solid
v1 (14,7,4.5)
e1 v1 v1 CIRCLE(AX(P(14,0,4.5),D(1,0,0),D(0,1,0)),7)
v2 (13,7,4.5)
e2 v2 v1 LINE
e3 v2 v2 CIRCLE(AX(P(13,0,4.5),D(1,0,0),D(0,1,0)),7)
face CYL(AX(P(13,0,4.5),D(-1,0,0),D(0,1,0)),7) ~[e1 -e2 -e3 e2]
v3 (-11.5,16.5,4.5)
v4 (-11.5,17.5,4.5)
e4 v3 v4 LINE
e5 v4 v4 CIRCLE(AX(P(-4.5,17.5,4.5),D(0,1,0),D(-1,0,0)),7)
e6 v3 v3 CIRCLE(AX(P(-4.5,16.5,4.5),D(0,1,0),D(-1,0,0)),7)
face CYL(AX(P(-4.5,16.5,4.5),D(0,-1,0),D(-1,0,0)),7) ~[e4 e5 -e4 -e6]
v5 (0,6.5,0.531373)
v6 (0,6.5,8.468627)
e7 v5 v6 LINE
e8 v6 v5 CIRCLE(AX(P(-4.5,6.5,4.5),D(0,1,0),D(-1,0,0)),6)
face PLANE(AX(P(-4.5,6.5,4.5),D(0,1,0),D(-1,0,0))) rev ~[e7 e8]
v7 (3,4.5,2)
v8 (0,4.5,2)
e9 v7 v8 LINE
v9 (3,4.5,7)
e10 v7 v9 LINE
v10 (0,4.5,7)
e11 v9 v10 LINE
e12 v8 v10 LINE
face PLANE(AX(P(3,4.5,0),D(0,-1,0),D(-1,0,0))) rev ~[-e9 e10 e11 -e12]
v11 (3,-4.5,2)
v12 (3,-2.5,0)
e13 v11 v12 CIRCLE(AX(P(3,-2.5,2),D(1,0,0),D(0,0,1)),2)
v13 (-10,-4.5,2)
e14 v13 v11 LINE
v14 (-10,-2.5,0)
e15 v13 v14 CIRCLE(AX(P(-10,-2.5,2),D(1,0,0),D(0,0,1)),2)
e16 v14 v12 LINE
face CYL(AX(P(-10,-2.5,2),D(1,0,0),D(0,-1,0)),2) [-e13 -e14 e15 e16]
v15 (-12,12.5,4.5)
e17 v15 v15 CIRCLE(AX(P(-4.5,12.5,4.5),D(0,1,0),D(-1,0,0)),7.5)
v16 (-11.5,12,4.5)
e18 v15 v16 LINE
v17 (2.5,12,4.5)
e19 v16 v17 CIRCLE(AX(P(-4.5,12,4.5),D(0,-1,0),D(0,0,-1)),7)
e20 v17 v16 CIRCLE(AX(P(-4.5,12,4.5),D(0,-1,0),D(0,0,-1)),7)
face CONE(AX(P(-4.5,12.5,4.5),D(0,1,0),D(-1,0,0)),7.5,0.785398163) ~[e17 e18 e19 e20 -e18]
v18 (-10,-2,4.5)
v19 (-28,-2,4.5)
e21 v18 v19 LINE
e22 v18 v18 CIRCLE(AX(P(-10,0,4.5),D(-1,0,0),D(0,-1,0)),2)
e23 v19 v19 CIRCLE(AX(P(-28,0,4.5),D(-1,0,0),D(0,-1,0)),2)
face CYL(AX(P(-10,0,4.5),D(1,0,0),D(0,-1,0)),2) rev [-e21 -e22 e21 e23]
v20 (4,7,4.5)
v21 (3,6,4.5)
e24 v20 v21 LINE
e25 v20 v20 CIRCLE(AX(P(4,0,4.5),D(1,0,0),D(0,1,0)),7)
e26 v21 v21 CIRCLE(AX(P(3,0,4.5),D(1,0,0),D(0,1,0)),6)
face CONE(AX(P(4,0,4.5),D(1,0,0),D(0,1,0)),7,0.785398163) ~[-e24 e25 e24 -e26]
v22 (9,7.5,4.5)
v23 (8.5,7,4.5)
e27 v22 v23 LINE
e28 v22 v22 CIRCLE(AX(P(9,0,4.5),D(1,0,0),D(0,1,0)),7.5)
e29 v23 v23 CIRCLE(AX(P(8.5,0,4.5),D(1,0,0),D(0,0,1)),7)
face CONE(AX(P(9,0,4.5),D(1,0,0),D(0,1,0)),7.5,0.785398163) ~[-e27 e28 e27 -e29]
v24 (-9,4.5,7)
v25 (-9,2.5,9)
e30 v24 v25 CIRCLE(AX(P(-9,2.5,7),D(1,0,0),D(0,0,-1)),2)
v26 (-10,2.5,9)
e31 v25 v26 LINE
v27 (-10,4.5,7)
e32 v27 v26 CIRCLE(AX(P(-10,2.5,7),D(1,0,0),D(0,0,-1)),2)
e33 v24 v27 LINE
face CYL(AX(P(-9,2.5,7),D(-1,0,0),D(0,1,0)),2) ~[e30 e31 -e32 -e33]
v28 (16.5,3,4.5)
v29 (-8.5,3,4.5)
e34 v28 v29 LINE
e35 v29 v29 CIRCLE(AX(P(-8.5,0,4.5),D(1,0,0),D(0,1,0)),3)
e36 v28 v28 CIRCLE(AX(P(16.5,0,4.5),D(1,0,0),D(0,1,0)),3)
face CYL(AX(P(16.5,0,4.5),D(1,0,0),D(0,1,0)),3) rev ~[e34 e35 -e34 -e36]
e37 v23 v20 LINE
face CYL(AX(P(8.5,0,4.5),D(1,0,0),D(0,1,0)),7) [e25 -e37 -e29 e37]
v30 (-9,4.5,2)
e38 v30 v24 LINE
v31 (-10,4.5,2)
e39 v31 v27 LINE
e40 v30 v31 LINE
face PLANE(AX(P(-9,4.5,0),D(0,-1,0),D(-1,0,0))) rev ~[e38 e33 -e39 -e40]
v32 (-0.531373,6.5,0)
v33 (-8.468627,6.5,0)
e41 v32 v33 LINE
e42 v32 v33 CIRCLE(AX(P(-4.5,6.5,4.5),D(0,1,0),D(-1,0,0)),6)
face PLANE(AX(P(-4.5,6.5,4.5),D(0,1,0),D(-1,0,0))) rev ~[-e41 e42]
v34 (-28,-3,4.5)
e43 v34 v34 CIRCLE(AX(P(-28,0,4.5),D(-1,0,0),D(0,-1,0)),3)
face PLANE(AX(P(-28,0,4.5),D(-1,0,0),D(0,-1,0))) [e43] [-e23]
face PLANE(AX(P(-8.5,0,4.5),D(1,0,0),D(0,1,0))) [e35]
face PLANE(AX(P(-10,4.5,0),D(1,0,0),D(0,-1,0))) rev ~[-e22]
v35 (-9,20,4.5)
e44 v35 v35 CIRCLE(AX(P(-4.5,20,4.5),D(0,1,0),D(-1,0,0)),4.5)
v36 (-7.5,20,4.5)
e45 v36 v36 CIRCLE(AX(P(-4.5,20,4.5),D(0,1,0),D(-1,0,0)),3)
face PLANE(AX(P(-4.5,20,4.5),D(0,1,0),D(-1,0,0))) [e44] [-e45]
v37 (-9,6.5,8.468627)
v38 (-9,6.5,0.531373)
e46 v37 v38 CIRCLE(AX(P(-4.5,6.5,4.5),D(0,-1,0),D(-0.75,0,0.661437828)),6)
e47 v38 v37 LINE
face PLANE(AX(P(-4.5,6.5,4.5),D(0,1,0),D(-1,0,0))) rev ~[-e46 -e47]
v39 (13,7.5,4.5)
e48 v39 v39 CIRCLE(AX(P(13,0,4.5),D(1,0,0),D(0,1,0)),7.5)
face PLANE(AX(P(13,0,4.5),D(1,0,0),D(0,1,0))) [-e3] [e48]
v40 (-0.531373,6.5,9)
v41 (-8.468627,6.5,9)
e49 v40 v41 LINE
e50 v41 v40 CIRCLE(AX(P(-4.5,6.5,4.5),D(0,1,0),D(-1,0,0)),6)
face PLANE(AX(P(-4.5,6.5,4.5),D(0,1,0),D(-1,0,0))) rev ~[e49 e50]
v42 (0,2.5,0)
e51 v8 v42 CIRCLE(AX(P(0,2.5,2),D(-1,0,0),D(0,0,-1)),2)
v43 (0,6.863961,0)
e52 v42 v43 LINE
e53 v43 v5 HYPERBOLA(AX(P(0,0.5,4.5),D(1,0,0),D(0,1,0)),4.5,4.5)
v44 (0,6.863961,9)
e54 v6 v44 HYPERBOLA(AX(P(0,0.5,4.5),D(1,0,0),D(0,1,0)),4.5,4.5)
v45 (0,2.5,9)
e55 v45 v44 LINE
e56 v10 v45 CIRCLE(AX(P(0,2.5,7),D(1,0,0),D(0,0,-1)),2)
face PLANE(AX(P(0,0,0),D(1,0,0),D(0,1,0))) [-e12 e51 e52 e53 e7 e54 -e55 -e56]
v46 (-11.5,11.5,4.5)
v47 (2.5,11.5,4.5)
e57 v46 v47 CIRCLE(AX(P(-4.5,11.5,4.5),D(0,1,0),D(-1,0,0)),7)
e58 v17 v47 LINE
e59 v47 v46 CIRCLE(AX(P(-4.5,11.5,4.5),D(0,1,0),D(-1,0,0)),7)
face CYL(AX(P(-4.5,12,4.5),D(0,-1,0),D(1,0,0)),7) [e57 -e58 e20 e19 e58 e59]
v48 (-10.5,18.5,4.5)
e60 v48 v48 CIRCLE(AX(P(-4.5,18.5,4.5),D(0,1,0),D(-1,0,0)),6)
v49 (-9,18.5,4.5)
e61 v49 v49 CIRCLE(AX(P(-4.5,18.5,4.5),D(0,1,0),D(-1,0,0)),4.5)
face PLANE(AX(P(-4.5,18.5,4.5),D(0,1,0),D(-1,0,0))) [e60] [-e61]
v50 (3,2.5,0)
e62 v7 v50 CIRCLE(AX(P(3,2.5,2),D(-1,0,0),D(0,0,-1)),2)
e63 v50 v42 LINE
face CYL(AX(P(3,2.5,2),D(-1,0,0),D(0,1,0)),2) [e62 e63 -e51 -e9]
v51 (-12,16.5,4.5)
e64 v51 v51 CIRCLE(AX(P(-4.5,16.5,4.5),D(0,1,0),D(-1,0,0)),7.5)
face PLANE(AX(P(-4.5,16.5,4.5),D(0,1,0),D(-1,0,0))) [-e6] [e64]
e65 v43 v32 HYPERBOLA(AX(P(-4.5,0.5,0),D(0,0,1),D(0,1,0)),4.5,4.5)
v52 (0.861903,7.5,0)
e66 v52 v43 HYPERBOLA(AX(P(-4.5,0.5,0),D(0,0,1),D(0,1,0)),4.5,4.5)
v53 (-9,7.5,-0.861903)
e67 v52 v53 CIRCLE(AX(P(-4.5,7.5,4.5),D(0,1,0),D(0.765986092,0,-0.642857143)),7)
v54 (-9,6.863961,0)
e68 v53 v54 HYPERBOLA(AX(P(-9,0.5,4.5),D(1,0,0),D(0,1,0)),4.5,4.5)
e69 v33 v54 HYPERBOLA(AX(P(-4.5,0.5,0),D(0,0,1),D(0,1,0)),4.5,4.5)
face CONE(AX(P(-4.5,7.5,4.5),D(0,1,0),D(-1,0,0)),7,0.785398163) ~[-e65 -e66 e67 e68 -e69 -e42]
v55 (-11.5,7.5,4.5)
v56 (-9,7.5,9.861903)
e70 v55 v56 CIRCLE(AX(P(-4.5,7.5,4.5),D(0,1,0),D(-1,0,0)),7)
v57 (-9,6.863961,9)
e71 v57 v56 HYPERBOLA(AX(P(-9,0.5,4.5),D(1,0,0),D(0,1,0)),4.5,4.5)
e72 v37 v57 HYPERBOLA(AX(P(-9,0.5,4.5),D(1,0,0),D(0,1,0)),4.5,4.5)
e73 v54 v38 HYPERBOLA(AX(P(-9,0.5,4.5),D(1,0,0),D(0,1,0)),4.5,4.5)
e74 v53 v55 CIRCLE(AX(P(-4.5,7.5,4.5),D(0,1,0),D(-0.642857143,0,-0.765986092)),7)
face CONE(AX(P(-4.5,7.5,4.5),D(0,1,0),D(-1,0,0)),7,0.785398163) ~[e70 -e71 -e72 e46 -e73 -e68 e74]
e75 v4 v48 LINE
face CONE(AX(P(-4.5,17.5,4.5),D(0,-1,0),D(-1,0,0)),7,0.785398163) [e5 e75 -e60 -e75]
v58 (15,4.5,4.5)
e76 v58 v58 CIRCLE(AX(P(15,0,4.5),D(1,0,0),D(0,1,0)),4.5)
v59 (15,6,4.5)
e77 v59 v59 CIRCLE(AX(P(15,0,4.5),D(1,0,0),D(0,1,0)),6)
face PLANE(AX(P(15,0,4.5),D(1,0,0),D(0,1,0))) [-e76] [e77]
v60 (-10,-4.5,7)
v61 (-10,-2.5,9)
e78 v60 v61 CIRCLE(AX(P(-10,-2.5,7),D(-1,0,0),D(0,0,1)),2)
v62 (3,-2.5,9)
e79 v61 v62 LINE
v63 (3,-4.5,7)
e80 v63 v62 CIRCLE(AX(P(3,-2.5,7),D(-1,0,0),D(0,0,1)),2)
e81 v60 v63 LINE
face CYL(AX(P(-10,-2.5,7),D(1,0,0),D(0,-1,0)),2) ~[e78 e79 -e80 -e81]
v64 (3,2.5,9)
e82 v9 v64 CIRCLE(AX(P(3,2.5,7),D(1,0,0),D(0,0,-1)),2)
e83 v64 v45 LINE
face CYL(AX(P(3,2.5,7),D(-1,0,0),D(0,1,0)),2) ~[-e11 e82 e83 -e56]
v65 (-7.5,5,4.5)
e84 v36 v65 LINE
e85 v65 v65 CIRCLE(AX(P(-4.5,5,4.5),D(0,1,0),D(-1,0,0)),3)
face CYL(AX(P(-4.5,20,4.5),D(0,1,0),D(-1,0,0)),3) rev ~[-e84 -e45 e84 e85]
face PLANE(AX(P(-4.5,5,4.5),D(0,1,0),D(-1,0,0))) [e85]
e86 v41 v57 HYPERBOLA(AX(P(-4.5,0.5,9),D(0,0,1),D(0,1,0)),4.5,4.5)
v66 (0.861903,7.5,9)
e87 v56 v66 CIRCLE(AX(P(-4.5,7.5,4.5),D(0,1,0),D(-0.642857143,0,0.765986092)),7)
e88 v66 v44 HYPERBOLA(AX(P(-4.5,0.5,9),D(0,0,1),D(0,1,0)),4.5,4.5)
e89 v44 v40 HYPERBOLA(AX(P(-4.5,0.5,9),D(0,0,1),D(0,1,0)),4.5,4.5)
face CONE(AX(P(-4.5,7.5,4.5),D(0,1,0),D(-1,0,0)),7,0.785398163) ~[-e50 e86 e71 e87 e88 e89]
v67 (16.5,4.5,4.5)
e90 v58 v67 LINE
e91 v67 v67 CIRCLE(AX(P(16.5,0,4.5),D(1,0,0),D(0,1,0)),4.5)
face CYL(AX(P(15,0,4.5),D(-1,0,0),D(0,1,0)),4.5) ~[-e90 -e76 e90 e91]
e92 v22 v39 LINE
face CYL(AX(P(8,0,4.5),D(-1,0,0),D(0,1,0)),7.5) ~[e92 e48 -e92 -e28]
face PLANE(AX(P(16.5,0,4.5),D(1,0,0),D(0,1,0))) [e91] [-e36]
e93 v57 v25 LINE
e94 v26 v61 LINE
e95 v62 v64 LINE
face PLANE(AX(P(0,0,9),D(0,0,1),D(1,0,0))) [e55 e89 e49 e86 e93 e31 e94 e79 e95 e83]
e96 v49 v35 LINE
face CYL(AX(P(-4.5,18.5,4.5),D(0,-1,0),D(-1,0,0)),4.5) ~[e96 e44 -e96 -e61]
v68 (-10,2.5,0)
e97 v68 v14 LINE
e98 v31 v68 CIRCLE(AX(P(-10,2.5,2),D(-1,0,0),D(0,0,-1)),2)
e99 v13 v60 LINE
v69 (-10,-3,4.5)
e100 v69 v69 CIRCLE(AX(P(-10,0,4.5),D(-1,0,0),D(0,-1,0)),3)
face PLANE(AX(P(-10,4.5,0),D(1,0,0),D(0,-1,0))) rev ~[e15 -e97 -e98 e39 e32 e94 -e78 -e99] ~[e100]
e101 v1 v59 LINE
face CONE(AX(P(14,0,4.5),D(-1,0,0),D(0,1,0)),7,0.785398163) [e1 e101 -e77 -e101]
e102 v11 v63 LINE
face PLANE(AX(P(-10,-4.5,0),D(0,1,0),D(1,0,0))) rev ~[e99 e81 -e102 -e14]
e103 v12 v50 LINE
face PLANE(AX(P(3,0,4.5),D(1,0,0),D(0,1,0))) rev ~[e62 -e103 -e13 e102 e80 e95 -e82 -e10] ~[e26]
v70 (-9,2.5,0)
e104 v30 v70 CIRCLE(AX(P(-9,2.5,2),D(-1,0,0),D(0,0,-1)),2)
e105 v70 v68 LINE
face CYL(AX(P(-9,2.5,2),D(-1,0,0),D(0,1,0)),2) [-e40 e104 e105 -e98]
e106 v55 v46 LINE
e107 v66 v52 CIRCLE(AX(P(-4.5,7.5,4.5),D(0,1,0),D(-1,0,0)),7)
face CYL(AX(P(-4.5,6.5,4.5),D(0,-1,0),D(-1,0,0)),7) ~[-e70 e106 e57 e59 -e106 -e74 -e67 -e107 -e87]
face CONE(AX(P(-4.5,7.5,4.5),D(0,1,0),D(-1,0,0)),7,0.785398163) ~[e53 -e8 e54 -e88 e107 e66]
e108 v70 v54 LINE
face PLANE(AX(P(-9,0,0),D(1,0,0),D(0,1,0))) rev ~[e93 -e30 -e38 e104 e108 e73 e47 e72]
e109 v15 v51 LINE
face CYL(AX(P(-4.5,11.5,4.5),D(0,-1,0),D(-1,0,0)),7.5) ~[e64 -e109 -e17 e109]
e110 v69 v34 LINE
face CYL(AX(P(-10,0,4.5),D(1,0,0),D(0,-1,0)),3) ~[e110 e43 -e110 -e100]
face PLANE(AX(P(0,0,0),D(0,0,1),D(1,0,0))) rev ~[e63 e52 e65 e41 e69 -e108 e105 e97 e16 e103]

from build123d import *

# Parameters (mm, degrees)
F1_DEPTH     = 9
F2_R         = 2
F3_R         = 3
F3_R_2       = 2
F4_DEPTH     = 18
F5_R         = 7
F6_DEPTH     = 5
F8_R         = 7.5
F9_DEPTH     = 5
F10_S5_R     = 7
F10_T6_DEPTH = 12
F11_R        = 7
F12_DEPTH    = 2
F13_SIZE     = 1
F14_R        = 4.5
F15_DEPTH    = 1.5
F16_R        = 3
F17_DEPTH    = 15
F18_R        = 7
F19_DEPTH    = 5
F20_R        = 7.5
F21_DEPTH    = 5
F22_R        = 7
F23_DEPTH    = 2
F24_R        = 4.5
F25_DEPTH    = 1.5
F26_R        = 3
F27_DEPTH    = 25
F28_S7_R     = 7
F28_T8_DEPTH = 12


# Not quite as in the source:
# - a fillet or chamfer that OpenCascade refuses, or shapes differently, is made with other operations: its cross-section is extruded or revolved along the edge and cut away or added
# - a feature names something its author has since deleted; it is built from what else it names


with BuildPart() as f1:
    # F0 (on Top) → F1 (new body)
    with BuildSketch(Plane.XY):
        Polygon((-10, -4.5), (3, -4.5), (3, 4.5), (0, 4.5), (0, 6.5), (-9, 6.5), (-9, 4.5), (-10, 4.5), align=None)
    extrude(amount=F1_DEPTH)

    # F2
    f2_edges = [f1.edges().sort_by_distance(p)[0] for p in [
        (-3.5, -4.5, 9),
        (-3.5, -4.5, 0),
        (1.5, 4.5, 0),
        (1.5, 4.5, 9),
        (-9.5, 4.5, 9),
        (-9.5, 4.5, 0),
    ]]
    fillet(f2_edges, radius=F2_R)

    # F3 (on face) → F4 (join)
    with BuildSketch(Plane(origin=(-10, 0, 0), x_dir=(0, -1, 0), z_dir=(-1, 0, 0))):
        with Locations((0, 4.5)):
            Circle(F3_R)
        with Locations((0, 4.5)):
            Circle(F3_R_2, mode=Mode.SUBTRACT)
    extrude(amount=F4_DEPTH)

    # F5 (on face) → F6 (join)
    with BuildSketch(Plane(origin=(0, 6.5, 0), x_dir=(-1, 0, 0), z_dir=(0, 1, 0))):
        with Locations((4.5, 4.5)):
            Circle(F5_R)
    extrude(amount=F6_DEPTH)

    # F7: chamfer of 1 on 1 edges, made by hand


with BuildPart() as f7_tool2:
    # F7_s3 → F7_t4 (revolve)
    with BuildSketch(Plane.XY.offset(4.5)):
        Polygon((-11.5, 7.5), (-10.5, 6.5), (-11.5, 6.5), align=None)
    revolve(axis=Axis((-4.5, 6.5, 4.5), (0, 1, 0)))

    split(bisect_by=Plane.YZ.offset(-9), keep=Keep.BOTTOM)


with BuildPart() as f1_1:
    add(f1.part)

    # F7_t1: cut F7_tool2
    add(f7_tool2.part, mode=Mode.SUBTRACT)


with BuildPart() as f7_tool7:
    # F7_s8 → F7_t9 (revolve)
    with BuildSketch(Plane.XY.offset(4.5)):
        Polygon((-11.5, 7.5), (-10.5, 6.5), (-11.5, 6.5), align=None)
    revolve(axis=Axis((-4.5, 6.5, 4.5), (0, 1, 0)))

    split(bisect_by=Plane.XY.offset(9), keep=Keep.TOP)


with BuildPart() as f1_2:
    add(f1_1.part)

    # F7_t6: cut F7_tool7
    add(f7_tool7.part, mode=Mode.SUBTRACT)


with BuildPart() as f7_tool12:
    # F7_s13 → F7_t14 (revolve)
    with BuildSketch(Plane.XY.offset(4.5)):
        Polygon((-11.5, 7.5), (-10.5, 6.5), (-11.5, 6.5), align=None)
    revolve(axis=Axis((-4.5, 6.5, 4.5), (0, 1, 0)))

    split(bisect_by=Plane.XY, keep=Keep.BOTTOM)


with BuildPart() as f1_3:
    add(f1_2.part)

    # F7_t11: cut F7_tool12
    add(f7_tool12.part, mode=Mode.SUBTRACT)


with BuildPart() as f7_tool17:
    # F7_s18 → F7_t19 (revolve)
    with BuildSketch(Plane.XY.offset(4.5)):
        Polygon((-11.5, 7.5), (-10.5, 6.5), (-11.5, 6.5), align=None)
    revolve(axis=Axis((-4.5, 6.5, 4.5), (0, 1, 0)))

    split(bisect_by=Plane.YZ, keep=Keep.TOP)


with BuildPart() as f1_4:
    add(f1_3.part)

    # F7_t16: cut F7_tool17
    add(f7_tool17.part, mode=Mode.SUBTRACT)

    # F8 (on face) → F9 (join)
    with BuildSketch(Plane(origin=(0, 11.5, 0), x_dir=(-1, 0, 0), z_dir=(0, 1, 0))):
        with Locations((4.5, 4.5)):
            Circle(F8_R)
    extrude(amount=F9_DEPTH)

    # F10: chamfer of 1 on 1 edges, made by hand


with BuildPart() as f10_tool2:
    # F10_s3 → F10_t4 (revolve)
    with BuildSketch(Plane.XY.offset(4.5)):
        Polygon((-12, 12.5), (-11, 11.5), (-12, 11.5), align=None)
    revolve(axis=Axis((-4.5, 11.5, 4.5), (0, 1, 0)))

    # F10_s5 → F10_t6 (cut, symmetric)
    with BuildSketch(Plane.XZ.offset(-12)):
        with Locations((-4.5, 4.5)):
            Circle(F10_S5_R)
    extrude(amount=F10_T6_DEPTH, both=True, mode=Mode.SUBTRACT)


with BuildPart() as f1_5:
    add(f1_4.part)

    # F10_t1: cut F10_tool2
    add(f10_tool2.part, mode=Mode.SUBTRACT)

    # F11 (on face) → F12 (join)
    with BuildSketch(Plane(origin=(0, 16.5, 0), x_dir=(-1, 0, 0), z_dir=(0, 1, 0))):
        with Locations((4.5, 4.5)):
            Circle(F11_R)
    extrude(amount=F12_DEPTH)

    # F13
    f13_edges = [f1_5.edges().sort_by_distance(p)[0] for p in [
        (2.5, 18.5, 4.5),
    ]]
    chamfer(f13_edges, length=F13_SIZE)

    # F14 (on face) → F15 (join)
    with BuildSketch(Plane(origin=(0, 18.5, 0), x_dir=(-1, 0, 0), z_dir=(0, 1, 0))):
        with Locations((4.5, 4.5)):
            Circle(F14_R)
    extrude(amount=F15_DEPTH)

    # F16 (on face) → F17 (cut)
    with BuildSketch(Plane(origin=(0, 20, 0), x_dir=(-1, 0, 0), z_dir=(0, 1, 0))):
        with Locations((4.5, 4.5)):
            Circle(F16_R)
    extrude(amount=-F17_DEPTH, mode=Mode.SUBTRACT)

    # F18 (on face) → F19 (join)
    with BuildSketch(Plane.YZ.offset(3)):
        with Locations((0, 4.5)):
            Circle(F18_R)
    extrude(amount=F19_DEPTH)

    # F20 (on face) → F21 (join)
    with BuildSketch(Plane.YZ.offset(8)):
        with Locations((0, 4.5)):
            Circle(F20_R)
    extrude(amount=F21_DEPTH)

    # F22 (on face) → F23 (join)
    with BuildSketch(Plane.YZ.offset(13)):
        with Locations((0, 4.5)):
            Circle(F22_R)
    extrude(amount=F23_DEPTH)

    # F24 (on face) → F25 (join)
    with BuildSketch(Plane.YZ.offset(15)):
        with Locations((0, 4.5)):
            Circle(F24_R)
    extrude(amount=F25_DEPTH)

    # F26 (on face) → F27 (cut)
    with BuildSketch(Plane.YZ.offset(16.5)):
        with Locations((0, 4.5)):
            Circle(F26_R)
    extrude(amount=-F27_DEPTH, mode=Mode.SUBTRACT)

    # F28: chamfer of 1 on 3 edges, made by hand

    # F28_s1 → F28_t2 (revolve, cut)
    with BuildSketch(Plane.XY.offset(4.5)):
        Polygon((4, 7), (3, 6), (3, 7), align=None)
    revolve(axis=Axis((3, 0, 4.5), (1, 0, 0)), mode=Mode.SUBTRACT)


with BuildPart() as f28_tool4:
    # F28_s5 → F28_t6 (revolve)
    with BuildSketch(Plane.XY.offset(4.5)):
        Polygon((9, 7.5), (8, 6.5), (8, 7.5), align=None)
    revolve(axis=Axis((8, 0, 4.5), (1, 0, 0)))

    # F28_s7 → F28_t8 (cut, symmetric)
    with BuildSketch(Plane.YZ.offset(8.5)):
        with Locations((0, 4.5)):
            Circle(F28_S7_R)
    extrude(amount=F28_T8_DEPTH, both=True, mode=Mode.SUBTRACT)


with BuildPart() as f1_6:
    add(f1_5.part)

    # F28_t3: cut F28_tool4
    add(f28_tool4.part, mode=Mode.SUBTRACT)

    # F28_s9 → F28_t10 (revolve, cut)
    with BuildSketch(Plane.XY.offset(4.5)):
        Polygon((14, 7), (15, 6), (15, 7), align=None)
    revolve(axis=Axis((15, 0, 4.5), (1, 0, 0)), mode=Mode.SUBTRACT)


solid = f1_6.part
